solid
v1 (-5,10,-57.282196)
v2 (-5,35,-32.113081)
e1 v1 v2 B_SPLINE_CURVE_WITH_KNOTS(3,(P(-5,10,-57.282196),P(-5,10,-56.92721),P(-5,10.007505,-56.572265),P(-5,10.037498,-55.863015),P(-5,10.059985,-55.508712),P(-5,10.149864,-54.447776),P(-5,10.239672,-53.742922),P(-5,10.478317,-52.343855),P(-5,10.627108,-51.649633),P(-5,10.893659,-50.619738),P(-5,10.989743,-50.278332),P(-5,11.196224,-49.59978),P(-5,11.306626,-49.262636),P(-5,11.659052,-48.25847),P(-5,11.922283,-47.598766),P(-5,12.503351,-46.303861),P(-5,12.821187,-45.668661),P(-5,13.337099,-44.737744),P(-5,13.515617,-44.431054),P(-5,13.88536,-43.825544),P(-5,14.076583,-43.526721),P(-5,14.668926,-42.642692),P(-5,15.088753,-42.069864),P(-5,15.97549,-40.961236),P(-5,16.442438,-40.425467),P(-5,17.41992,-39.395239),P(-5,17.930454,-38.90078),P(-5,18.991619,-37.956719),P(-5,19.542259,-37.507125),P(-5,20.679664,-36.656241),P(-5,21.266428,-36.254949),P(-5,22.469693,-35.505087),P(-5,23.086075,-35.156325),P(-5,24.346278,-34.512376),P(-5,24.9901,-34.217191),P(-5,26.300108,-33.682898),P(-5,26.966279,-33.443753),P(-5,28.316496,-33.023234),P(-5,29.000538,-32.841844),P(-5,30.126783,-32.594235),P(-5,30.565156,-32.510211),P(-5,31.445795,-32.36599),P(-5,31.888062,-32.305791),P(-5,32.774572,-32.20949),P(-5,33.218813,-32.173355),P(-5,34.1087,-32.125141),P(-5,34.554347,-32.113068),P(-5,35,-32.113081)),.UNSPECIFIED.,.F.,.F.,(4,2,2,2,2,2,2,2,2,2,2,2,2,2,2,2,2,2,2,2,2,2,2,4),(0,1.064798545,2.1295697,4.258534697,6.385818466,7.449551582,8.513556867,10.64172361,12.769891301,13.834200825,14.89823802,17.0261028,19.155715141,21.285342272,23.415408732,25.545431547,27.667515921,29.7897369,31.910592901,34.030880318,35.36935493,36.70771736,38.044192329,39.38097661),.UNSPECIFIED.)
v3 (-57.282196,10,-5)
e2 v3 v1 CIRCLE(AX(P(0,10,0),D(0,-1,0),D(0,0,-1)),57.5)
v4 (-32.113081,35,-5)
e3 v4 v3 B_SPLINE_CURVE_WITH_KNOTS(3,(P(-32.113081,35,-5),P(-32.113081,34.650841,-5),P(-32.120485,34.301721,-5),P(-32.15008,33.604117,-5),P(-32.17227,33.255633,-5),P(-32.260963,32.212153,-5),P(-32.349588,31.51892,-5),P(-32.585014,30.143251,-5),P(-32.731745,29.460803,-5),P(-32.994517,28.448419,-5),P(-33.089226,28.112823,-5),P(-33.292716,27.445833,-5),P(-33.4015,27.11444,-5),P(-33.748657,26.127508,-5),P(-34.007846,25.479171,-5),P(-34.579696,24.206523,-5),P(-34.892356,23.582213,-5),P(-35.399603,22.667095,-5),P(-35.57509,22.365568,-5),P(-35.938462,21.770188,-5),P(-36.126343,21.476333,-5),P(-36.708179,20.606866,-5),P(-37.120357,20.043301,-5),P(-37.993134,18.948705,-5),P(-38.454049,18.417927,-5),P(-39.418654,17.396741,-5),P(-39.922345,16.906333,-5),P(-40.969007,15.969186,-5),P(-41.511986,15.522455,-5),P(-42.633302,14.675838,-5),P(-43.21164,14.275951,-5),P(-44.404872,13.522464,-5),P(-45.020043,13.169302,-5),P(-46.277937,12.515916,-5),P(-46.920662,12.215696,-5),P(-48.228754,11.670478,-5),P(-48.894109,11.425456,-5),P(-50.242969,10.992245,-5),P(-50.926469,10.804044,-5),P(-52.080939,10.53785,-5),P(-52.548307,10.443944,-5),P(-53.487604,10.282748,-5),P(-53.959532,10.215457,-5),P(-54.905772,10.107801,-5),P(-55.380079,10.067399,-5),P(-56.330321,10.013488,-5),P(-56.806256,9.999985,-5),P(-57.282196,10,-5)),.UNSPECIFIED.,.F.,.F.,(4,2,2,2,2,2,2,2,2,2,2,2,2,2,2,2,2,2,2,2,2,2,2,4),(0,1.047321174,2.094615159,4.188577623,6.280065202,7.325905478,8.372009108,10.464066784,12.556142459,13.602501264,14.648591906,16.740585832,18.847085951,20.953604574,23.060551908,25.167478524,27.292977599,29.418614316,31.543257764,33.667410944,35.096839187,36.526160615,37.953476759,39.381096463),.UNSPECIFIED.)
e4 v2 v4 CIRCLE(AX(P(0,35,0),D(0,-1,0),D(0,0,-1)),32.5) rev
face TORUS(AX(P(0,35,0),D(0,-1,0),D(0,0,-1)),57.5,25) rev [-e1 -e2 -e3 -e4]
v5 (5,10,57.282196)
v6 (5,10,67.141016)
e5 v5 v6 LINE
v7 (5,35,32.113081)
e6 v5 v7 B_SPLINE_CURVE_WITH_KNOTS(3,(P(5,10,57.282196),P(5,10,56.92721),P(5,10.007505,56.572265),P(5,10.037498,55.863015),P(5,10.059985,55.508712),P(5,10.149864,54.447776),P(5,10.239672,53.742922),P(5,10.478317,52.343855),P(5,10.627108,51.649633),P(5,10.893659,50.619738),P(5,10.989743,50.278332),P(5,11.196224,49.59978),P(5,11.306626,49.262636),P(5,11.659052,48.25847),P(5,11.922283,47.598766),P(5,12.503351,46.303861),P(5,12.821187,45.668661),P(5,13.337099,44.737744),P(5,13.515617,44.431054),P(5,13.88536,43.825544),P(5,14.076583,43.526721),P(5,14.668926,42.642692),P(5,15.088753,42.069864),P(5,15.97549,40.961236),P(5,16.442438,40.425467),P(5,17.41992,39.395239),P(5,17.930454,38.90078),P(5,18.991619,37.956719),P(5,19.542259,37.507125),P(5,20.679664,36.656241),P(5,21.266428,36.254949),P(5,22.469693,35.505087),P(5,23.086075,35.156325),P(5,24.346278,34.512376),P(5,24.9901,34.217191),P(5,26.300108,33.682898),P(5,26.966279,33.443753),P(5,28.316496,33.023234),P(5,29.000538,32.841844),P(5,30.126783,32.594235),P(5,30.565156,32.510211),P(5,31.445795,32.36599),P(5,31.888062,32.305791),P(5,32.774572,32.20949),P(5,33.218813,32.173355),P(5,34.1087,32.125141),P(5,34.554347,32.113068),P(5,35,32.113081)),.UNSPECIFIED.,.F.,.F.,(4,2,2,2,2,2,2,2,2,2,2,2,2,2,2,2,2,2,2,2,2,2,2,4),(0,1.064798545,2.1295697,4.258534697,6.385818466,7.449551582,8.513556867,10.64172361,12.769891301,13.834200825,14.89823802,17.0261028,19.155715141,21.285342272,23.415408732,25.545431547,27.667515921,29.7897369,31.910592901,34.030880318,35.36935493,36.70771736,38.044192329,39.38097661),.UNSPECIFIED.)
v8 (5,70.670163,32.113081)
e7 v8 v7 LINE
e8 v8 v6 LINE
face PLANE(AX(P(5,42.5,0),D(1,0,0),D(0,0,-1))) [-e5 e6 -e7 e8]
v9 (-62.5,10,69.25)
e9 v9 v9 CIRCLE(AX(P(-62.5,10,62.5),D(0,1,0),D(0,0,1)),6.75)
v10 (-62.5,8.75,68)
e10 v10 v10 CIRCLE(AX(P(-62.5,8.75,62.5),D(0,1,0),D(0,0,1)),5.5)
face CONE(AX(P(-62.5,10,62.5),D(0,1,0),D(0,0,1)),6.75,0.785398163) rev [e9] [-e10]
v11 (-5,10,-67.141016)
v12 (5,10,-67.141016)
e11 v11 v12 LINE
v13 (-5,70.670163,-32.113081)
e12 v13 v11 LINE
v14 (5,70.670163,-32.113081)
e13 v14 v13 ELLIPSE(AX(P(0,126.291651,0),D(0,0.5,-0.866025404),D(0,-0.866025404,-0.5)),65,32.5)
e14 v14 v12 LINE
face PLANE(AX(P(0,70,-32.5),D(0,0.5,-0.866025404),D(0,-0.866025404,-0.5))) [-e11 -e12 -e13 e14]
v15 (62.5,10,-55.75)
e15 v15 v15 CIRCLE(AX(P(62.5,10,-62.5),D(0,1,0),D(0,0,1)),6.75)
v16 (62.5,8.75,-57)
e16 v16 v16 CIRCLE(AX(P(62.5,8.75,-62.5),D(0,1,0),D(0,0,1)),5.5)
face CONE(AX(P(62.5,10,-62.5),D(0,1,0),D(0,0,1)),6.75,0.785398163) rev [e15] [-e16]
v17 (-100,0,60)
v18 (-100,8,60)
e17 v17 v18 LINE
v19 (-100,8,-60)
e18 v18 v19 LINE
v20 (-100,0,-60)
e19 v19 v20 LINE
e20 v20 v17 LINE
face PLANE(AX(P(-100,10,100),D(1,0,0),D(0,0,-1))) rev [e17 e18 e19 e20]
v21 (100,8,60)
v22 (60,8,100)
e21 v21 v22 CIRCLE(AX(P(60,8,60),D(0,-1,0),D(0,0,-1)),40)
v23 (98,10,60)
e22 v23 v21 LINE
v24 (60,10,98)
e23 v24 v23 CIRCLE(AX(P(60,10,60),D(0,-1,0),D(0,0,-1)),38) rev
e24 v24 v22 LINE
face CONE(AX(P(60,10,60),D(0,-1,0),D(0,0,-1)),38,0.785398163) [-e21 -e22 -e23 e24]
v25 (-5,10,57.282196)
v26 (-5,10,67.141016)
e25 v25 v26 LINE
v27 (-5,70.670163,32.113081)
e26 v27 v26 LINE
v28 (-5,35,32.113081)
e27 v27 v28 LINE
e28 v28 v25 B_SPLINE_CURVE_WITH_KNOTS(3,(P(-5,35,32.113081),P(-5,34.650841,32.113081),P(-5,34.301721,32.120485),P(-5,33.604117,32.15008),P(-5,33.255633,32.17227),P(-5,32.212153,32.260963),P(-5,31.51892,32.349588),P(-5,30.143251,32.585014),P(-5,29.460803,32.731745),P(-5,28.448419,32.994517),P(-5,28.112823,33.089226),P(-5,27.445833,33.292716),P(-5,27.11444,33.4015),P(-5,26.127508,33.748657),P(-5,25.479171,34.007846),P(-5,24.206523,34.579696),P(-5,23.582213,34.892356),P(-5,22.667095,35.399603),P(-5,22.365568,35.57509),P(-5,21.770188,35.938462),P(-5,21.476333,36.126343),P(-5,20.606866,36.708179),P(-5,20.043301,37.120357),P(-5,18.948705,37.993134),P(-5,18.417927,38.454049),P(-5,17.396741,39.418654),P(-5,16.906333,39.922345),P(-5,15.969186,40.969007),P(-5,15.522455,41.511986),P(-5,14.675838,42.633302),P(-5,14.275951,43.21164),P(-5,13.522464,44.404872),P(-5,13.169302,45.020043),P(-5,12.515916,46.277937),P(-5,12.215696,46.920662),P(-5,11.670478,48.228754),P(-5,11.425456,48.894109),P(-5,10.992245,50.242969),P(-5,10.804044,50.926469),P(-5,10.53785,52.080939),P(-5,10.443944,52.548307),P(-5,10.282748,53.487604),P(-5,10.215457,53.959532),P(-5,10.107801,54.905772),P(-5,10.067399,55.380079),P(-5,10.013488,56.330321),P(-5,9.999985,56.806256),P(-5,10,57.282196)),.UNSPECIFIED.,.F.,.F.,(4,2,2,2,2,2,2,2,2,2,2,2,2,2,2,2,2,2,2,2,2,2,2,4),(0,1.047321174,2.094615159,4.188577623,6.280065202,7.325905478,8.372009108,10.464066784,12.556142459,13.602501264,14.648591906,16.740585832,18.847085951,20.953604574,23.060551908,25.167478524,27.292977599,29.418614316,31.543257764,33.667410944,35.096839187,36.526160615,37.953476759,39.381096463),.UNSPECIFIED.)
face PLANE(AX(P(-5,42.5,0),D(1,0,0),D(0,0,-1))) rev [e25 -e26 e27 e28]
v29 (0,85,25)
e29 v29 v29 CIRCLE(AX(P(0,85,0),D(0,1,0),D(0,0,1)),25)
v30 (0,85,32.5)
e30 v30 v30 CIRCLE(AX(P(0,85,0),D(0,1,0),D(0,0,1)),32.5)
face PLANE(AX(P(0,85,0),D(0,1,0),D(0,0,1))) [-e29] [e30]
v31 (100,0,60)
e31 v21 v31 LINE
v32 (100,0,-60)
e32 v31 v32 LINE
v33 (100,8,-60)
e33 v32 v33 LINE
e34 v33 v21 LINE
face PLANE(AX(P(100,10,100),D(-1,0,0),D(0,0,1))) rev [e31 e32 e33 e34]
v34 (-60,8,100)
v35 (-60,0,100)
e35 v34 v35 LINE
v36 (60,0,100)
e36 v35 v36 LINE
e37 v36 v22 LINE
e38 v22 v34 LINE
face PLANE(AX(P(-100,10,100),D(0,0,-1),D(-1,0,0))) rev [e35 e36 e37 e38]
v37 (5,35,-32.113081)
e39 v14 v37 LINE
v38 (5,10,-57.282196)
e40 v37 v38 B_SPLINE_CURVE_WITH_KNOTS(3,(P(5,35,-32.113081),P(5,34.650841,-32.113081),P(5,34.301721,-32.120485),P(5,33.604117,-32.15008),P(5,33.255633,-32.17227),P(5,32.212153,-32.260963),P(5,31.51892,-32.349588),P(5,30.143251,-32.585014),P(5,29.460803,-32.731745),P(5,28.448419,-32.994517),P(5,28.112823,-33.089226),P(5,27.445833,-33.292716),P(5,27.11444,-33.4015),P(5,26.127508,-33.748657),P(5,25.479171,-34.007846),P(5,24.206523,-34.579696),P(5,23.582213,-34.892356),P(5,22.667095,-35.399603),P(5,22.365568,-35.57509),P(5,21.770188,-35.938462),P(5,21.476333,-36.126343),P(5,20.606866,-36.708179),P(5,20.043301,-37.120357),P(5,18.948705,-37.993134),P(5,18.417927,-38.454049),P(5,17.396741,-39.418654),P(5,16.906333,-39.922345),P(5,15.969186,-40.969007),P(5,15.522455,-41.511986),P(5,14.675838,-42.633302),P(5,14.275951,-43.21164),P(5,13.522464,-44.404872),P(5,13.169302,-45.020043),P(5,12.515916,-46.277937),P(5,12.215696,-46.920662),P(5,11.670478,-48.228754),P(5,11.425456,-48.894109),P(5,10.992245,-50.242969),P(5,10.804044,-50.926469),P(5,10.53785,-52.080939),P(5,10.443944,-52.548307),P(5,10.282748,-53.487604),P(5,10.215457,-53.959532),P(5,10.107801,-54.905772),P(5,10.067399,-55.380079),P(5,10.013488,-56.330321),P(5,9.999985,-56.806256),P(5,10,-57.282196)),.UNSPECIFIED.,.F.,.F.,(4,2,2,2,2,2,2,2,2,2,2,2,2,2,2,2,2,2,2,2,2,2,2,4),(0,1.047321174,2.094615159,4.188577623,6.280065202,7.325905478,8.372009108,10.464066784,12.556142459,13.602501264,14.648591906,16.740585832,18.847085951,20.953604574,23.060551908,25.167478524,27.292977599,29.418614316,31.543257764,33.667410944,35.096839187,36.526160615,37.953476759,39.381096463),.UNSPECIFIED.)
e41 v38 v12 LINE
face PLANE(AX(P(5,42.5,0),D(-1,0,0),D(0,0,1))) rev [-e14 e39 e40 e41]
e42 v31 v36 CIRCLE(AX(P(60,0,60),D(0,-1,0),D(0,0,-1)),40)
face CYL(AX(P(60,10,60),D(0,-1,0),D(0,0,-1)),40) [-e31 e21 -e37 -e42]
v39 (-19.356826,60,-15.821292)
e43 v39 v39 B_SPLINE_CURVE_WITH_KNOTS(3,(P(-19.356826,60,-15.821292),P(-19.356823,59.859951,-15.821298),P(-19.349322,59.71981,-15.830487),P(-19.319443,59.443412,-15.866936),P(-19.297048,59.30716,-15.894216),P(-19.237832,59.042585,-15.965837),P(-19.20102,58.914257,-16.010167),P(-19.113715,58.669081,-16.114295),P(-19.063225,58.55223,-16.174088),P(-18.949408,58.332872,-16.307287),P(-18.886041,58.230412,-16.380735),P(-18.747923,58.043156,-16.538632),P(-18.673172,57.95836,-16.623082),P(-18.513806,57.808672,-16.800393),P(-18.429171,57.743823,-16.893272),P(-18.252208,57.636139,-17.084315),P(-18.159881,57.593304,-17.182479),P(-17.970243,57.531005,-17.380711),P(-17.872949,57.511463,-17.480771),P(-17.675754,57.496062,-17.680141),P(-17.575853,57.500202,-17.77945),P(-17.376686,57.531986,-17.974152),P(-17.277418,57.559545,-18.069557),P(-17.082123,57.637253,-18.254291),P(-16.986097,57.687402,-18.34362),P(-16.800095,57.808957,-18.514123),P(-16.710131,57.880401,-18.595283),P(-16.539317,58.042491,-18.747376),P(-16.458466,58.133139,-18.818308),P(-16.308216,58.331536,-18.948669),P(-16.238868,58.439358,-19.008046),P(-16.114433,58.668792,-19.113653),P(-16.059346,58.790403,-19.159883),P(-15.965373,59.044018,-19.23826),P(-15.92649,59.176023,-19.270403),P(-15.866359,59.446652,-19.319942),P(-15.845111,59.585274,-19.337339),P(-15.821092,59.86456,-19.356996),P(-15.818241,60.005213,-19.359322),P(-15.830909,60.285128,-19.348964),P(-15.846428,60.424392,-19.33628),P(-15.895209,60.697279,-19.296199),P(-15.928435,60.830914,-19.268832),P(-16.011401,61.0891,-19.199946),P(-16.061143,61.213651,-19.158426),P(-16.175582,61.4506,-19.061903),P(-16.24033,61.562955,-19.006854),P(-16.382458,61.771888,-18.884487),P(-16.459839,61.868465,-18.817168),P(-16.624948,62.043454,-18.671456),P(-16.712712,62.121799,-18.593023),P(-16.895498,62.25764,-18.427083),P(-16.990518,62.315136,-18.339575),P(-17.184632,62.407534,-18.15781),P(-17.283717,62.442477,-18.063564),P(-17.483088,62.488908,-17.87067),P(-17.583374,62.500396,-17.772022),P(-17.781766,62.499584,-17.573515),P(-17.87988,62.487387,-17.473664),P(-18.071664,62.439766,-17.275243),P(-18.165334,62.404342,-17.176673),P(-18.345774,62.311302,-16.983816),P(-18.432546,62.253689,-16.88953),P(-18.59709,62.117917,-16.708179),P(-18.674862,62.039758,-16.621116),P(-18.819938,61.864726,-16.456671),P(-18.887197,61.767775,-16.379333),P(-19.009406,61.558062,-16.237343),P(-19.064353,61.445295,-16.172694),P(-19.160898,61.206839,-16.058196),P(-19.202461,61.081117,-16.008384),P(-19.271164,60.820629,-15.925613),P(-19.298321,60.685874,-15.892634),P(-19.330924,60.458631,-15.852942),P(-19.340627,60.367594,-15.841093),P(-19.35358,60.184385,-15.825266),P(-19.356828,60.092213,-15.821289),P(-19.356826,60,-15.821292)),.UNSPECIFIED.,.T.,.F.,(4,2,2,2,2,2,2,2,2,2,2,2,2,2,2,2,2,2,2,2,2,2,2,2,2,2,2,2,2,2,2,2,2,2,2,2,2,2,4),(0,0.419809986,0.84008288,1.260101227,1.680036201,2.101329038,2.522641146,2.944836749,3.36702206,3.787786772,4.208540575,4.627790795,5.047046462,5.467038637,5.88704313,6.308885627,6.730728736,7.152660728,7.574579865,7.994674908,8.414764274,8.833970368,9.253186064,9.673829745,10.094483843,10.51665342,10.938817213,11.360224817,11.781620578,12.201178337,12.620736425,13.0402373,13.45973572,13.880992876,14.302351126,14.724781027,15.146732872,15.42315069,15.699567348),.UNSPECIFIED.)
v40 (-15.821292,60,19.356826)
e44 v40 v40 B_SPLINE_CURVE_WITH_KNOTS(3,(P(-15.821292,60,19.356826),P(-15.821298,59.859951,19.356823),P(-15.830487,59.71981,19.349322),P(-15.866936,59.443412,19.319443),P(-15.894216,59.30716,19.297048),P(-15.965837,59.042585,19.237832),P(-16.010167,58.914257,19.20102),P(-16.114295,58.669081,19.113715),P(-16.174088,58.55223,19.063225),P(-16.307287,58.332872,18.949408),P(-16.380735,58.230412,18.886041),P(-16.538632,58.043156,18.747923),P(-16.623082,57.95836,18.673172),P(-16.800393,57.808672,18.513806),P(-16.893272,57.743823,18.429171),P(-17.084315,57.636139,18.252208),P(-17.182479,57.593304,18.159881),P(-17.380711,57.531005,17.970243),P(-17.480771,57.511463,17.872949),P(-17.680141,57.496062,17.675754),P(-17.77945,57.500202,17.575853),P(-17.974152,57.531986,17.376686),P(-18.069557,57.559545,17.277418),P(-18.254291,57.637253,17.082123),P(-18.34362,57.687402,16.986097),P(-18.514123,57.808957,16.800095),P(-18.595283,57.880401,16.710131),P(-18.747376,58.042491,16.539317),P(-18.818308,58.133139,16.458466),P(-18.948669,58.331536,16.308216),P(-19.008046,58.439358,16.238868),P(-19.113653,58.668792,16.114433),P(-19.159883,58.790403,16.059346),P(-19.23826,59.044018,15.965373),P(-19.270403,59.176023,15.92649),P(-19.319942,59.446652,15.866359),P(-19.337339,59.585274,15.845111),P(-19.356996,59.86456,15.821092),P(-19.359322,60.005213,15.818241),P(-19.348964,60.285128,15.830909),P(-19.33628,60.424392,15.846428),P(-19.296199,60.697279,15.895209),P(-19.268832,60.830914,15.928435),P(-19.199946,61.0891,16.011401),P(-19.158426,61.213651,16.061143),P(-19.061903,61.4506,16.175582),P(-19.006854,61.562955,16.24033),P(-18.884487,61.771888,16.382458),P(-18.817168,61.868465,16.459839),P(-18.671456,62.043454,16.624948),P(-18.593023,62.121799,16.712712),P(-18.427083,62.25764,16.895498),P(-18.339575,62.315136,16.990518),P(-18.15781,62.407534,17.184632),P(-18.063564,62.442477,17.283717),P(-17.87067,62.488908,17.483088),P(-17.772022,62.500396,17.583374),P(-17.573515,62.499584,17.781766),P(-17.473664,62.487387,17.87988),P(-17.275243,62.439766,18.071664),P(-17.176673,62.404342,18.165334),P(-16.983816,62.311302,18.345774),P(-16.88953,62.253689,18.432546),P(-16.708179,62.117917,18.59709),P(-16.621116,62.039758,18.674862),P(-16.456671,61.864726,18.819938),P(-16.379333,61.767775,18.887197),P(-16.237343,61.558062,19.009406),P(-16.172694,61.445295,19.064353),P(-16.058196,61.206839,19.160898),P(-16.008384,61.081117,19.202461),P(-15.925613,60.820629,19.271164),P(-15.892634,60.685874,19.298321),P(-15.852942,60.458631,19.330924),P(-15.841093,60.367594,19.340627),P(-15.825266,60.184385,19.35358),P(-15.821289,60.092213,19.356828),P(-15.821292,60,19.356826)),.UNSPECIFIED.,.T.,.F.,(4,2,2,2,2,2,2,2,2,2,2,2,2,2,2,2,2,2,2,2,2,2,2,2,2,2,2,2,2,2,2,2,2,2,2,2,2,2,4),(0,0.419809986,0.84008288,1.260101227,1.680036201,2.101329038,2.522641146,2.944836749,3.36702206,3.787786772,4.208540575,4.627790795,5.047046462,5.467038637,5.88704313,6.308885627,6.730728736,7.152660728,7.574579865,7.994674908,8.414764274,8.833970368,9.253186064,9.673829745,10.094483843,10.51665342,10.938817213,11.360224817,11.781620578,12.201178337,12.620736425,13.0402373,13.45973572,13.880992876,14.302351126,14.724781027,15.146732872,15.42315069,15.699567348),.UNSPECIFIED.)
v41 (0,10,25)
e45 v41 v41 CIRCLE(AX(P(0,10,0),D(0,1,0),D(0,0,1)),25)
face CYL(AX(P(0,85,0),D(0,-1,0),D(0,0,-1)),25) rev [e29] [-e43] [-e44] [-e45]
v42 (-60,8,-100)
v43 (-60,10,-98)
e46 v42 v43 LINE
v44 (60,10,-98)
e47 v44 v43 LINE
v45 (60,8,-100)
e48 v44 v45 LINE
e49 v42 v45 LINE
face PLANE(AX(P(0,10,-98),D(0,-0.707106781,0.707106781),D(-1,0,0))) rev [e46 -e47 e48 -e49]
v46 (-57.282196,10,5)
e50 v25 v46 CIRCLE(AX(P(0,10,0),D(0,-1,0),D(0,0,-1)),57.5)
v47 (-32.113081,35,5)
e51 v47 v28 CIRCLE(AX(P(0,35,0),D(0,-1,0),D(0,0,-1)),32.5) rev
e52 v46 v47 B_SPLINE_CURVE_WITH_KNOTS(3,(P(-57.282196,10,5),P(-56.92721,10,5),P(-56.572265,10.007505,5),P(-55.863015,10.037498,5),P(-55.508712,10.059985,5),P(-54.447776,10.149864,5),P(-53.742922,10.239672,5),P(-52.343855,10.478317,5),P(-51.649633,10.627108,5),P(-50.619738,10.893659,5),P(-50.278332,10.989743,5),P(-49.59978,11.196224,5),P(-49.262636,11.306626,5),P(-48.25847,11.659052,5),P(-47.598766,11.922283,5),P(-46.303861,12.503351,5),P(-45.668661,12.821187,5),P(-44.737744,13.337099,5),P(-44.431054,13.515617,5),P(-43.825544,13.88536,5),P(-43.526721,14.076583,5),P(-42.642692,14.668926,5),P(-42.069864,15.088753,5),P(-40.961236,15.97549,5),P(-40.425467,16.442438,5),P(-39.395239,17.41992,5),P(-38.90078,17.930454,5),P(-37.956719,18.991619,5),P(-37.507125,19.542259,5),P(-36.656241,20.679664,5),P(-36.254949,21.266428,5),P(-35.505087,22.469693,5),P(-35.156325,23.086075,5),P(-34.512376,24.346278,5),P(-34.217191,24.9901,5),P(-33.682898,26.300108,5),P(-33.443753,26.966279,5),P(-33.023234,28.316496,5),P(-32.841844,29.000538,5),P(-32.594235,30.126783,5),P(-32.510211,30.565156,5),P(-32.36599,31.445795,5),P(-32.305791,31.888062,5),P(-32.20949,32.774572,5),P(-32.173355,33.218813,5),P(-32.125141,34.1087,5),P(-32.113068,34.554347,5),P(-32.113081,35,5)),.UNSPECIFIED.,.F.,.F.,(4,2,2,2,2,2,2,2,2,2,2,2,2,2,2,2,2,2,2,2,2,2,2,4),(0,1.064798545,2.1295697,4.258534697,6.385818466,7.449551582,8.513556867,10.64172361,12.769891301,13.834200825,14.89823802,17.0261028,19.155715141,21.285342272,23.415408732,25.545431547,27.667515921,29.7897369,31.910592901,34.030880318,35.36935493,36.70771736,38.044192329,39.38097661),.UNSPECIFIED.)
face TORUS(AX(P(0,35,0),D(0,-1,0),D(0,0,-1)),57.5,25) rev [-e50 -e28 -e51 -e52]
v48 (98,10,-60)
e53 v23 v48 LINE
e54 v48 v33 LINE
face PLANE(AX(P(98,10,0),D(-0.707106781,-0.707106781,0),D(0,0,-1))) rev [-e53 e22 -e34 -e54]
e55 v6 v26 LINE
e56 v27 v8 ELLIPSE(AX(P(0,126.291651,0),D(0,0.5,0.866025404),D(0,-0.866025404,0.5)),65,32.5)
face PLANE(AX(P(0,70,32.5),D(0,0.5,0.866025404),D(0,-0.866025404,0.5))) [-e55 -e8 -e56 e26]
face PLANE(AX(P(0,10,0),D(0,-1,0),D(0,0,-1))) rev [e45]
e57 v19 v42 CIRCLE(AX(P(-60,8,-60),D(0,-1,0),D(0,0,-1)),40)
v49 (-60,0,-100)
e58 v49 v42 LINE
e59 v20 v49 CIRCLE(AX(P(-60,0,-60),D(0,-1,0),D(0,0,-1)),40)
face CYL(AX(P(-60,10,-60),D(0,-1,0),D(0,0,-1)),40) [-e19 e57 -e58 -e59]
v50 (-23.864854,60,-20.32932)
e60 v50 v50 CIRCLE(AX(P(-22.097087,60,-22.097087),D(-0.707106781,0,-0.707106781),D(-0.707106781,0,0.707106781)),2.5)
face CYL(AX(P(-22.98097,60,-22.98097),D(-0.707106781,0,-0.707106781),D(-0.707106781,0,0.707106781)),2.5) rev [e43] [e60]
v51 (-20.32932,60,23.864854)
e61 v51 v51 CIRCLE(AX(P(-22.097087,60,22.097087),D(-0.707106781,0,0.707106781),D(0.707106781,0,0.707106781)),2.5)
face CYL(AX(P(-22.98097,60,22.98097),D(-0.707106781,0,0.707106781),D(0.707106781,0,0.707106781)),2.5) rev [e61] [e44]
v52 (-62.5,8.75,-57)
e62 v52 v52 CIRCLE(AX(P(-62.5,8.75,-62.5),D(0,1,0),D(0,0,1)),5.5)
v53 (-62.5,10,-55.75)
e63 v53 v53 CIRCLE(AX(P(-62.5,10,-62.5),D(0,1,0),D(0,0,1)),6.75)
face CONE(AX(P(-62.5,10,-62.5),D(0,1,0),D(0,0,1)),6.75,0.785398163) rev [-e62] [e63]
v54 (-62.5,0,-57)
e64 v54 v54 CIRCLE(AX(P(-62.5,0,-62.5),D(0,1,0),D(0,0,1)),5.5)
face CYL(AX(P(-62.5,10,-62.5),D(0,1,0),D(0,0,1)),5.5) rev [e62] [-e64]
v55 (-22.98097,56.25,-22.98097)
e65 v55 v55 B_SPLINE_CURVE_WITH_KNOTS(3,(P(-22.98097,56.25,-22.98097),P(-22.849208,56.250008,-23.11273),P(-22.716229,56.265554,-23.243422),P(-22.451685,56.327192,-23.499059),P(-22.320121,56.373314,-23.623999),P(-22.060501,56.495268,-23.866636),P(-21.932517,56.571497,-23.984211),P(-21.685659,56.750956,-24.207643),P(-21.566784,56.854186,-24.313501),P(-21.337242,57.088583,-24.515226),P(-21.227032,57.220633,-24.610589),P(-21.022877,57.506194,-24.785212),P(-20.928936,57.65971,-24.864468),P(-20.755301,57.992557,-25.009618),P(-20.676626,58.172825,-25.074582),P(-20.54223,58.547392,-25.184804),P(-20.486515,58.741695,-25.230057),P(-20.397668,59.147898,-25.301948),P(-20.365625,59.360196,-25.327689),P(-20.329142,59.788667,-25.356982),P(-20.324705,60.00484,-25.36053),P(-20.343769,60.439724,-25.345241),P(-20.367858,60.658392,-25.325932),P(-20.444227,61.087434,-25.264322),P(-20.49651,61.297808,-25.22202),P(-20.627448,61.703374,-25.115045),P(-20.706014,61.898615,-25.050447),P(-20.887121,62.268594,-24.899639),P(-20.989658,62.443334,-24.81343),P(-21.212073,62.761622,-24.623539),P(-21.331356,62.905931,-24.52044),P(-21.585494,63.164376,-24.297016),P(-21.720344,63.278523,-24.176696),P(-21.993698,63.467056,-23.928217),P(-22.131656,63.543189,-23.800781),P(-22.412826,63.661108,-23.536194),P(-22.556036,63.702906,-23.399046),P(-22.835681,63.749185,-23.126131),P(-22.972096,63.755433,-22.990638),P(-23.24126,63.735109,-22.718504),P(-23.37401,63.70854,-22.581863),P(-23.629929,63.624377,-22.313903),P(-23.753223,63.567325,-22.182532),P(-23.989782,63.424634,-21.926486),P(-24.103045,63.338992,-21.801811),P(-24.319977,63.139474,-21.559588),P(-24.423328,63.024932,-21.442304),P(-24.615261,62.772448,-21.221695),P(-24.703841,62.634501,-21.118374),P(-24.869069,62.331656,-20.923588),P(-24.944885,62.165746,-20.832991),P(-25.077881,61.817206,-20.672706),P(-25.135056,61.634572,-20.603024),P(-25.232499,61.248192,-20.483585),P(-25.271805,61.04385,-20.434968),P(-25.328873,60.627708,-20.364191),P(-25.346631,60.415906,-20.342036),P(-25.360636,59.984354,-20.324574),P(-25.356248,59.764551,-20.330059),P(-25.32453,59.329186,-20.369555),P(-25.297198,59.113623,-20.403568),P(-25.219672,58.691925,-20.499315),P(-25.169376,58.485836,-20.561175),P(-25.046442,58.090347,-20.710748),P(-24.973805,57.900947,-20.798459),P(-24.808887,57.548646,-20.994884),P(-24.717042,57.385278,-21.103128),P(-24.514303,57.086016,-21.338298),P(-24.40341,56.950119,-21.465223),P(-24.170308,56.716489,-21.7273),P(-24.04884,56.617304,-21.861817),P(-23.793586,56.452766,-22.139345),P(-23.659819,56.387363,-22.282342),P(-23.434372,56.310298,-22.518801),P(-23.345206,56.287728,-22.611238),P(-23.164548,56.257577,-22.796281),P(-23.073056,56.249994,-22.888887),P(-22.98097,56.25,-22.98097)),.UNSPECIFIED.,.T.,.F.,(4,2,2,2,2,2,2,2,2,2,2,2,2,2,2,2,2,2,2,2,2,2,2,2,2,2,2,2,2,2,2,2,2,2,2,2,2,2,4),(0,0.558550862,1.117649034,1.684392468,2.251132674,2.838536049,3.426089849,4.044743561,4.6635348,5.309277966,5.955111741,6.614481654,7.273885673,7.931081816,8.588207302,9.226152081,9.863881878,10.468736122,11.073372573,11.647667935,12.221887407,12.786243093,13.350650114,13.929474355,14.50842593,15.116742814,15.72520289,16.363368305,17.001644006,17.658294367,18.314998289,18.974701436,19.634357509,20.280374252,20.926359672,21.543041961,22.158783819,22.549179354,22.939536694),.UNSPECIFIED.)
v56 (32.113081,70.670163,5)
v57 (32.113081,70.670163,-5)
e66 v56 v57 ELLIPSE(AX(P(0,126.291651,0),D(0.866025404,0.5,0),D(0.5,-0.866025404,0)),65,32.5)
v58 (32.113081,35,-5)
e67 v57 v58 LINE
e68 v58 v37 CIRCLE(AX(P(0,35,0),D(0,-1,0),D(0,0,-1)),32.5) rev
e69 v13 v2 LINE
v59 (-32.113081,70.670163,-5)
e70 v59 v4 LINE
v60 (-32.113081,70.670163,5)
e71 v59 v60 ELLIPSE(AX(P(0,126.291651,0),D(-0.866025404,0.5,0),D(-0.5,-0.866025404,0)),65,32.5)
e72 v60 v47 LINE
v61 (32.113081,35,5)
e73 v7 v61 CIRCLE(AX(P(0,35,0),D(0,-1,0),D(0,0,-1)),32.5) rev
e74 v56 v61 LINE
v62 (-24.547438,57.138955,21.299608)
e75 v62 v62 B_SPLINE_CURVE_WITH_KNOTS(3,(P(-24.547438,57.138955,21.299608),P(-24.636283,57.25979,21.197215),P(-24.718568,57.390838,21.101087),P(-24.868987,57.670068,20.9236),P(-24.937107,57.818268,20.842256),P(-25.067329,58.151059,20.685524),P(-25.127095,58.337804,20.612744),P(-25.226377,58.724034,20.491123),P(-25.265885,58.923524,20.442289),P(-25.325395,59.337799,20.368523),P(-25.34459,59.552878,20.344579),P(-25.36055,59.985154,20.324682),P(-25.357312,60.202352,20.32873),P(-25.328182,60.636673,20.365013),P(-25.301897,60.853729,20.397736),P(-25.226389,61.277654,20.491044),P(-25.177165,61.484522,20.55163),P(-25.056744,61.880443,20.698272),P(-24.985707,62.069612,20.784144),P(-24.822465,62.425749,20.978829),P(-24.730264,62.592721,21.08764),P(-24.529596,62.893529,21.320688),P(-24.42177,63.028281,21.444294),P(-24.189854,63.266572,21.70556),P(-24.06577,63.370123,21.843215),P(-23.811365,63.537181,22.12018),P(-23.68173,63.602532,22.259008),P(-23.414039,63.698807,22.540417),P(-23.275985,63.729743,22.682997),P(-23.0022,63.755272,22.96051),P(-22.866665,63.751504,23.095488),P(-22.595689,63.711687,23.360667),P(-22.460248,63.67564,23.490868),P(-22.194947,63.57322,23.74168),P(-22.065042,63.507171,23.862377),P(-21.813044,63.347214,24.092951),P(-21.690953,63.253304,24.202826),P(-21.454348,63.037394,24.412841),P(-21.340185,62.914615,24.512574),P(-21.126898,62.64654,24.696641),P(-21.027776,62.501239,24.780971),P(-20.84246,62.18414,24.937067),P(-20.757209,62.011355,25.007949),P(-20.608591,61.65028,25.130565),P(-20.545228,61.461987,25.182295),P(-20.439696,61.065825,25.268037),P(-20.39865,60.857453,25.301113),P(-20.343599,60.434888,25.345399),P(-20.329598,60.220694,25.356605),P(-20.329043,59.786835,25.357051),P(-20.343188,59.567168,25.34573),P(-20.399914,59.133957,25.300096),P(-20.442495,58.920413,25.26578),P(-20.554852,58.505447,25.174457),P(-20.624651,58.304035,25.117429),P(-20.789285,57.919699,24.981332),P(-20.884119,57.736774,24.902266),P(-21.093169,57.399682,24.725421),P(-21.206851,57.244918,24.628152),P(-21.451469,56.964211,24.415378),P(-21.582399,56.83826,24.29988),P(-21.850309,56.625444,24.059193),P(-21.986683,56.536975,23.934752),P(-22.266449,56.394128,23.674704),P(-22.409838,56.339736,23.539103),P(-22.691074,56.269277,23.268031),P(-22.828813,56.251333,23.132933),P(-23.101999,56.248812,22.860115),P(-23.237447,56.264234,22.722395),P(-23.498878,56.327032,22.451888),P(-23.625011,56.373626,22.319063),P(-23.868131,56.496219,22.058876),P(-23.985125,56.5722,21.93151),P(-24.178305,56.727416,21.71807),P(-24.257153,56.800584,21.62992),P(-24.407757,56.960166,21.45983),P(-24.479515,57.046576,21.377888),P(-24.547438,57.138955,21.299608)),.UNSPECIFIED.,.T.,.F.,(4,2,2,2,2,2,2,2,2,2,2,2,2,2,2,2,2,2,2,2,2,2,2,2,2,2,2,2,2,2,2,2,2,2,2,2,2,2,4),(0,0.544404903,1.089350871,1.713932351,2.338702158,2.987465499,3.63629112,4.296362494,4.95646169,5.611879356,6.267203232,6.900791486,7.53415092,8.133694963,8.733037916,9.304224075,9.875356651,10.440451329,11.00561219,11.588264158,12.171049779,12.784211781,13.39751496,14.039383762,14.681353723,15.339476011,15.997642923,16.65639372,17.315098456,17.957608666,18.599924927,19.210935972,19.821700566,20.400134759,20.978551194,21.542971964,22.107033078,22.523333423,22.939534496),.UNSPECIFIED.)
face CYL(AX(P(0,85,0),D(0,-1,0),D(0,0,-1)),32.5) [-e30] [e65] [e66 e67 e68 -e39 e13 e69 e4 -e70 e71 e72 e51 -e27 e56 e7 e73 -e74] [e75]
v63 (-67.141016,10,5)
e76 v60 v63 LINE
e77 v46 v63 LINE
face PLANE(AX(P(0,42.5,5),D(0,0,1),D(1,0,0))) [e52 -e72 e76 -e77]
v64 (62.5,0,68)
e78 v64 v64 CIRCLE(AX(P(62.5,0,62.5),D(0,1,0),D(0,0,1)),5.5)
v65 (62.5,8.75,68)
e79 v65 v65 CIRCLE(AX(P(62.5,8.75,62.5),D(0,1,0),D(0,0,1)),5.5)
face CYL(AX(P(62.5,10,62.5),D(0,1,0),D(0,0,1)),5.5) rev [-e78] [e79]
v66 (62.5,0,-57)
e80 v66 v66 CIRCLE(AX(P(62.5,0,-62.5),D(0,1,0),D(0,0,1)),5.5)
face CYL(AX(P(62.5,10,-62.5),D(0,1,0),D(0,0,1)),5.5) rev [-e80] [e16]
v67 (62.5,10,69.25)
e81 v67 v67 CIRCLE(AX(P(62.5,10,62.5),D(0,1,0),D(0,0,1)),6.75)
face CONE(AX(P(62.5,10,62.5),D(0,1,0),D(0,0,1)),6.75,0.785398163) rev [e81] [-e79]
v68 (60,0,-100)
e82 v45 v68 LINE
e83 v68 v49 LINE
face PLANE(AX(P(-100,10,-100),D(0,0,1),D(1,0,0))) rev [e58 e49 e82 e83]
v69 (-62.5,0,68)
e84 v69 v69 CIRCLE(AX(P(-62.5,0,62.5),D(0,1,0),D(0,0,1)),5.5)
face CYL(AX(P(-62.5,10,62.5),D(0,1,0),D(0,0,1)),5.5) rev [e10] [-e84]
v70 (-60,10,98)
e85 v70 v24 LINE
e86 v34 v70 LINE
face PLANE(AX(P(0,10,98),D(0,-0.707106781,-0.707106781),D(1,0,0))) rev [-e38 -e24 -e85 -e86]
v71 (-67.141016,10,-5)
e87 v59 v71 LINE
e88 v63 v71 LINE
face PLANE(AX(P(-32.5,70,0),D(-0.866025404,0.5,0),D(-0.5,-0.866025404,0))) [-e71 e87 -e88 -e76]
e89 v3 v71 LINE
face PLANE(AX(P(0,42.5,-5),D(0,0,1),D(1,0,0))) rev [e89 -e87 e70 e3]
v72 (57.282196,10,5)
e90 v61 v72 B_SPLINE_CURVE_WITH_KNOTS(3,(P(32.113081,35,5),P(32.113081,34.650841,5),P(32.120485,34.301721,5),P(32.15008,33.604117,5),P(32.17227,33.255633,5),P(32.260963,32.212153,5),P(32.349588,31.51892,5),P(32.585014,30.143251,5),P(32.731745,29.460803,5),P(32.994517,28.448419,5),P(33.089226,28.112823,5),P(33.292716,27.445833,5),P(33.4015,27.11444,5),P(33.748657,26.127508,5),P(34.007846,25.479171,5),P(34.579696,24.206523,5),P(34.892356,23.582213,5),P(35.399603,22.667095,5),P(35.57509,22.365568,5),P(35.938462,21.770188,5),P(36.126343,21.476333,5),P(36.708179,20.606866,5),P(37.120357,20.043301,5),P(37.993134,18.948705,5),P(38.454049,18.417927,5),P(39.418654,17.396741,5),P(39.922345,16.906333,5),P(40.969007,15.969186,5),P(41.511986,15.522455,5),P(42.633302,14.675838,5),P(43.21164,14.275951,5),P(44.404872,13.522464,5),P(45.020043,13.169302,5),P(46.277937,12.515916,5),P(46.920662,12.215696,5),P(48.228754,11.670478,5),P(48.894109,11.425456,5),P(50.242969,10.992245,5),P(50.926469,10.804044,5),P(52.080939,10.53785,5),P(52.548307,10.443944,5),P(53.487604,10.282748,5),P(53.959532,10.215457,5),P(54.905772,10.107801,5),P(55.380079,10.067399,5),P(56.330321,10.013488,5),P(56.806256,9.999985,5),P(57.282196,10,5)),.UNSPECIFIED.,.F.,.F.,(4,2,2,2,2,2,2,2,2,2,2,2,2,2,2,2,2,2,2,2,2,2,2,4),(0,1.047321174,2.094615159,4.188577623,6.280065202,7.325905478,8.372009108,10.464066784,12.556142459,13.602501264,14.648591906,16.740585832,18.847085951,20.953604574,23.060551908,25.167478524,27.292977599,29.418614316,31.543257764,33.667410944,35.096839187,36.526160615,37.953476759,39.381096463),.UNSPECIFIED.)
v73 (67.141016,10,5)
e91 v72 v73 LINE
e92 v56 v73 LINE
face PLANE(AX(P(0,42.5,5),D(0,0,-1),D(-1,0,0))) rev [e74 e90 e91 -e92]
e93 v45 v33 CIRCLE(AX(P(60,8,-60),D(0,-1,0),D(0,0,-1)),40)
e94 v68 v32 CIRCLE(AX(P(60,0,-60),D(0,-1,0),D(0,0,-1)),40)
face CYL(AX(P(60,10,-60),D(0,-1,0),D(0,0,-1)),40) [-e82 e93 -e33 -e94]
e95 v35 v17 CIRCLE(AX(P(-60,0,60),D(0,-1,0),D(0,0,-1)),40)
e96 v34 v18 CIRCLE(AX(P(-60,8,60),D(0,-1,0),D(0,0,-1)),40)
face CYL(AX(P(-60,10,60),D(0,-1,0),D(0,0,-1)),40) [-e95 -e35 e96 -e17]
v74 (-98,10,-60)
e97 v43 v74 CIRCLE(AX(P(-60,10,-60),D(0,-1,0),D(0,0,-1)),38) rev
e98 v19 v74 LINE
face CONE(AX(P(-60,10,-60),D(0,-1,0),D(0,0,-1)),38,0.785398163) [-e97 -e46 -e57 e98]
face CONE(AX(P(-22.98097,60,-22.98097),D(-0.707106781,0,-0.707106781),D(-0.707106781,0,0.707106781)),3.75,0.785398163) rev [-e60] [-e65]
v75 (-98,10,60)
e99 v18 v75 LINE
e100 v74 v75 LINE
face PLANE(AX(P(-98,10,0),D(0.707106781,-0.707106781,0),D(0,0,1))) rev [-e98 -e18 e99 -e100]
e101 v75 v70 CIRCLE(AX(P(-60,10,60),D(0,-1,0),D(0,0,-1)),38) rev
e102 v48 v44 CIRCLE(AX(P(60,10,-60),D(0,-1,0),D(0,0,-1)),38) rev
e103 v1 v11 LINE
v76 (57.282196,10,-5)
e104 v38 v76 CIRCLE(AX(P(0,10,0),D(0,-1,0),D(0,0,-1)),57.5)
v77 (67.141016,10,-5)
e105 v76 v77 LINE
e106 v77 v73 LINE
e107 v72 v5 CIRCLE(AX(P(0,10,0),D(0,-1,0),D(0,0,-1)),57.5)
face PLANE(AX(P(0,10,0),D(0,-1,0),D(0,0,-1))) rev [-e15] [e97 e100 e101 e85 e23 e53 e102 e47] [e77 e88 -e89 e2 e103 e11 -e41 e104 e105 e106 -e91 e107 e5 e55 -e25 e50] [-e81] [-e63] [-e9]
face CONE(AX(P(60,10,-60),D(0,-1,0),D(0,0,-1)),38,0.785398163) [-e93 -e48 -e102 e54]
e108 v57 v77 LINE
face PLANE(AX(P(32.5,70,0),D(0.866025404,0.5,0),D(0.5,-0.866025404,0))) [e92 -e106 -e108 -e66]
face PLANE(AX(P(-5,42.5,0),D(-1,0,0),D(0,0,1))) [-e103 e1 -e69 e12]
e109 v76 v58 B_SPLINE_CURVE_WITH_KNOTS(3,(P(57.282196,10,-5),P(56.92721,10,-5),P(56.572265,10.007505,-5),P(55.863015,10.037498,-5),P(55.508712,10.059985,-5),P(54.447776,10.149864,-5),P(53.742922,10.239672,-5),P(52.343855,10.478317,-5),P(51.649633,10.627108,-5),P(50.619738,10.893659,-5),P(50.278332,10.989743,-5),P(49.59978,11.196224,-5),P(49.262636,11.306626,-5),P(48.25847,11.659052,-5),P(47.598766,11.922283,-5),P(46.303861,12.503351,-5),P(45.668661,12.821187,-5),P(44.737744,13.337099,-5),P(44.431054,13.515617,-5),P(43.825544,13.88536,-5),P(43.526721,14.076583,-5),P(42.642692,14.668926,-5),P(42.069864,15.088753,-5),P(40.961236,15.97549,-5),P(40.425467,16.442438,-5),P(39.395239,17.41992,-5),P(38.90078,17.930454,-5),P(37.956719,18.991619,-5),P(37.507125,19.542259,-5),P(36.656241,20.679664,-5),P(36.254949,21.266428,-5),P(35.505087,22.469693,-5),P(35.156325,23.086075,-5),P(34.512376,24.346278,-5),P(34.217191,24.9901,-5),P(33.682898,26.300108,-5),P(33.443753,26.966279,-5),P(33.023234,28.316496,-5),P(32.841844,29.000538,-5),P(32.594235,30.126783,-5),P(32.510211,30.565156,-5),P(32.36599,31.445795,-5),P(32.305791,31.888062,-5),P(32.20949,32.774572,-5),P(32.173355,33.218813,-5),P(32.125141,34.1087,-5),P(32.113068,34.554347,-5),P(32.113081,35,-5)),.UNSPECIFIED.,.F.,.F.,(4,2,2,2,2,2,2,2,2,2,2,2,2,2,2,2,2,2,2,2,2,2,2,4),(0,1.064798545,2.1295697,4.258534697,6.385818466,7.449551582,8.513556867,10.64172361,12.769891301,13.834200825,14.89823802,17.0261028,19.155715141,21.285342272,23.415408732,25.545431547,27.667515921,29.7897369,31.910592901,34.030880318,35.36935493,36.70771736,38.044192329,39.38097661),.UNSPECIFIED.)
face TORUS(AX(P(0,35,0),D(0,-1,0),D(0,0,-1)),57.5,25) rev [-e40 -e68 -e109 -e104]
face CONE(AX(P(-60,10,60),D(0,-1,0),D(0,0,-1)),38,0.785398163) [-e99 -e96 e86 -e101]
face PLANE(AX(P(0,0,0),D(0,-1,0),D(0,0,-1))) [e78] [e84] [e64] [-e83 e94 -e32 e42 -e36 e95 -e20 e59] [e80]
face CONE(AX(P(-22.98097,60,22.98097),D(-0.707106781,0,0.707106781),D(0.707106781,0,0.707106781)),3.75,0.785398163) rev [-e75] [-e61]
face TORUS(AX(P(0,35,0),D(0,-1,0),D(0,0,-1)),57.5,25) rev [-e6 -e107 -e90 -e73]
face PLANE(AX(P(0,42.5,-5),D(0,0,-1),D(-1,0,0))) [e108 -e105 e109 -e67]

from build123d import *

# Parameters (mm, degrees)
SKETCH2_W                       = 200
SKETCH2_H                       = 200
BOSS_EXTRUDE1_DEPTH             = 10
SKETCH3_R                       = 32.5
SKETCH3_R_2                     = 25
BOSS_EXTRUDE2_DEPTH             = 75
M10_CLEARANCE_HOLE1_D           = 11
M10_CLEARANCE_HOLE1_CSINK_D     = 13.5
M10_CLEARANCE_HOLE1_CSINK_ANGLE = 90
CIRPATTERN1_COUNT               = 2
CIRPATTERN1_ANGLE               = 90
RIB5_REACH                      = 167
SKETCH13_WALL_W                 = 401.282032406
SKETCH13_WALL_H                 = 10
CIRPATTERN2_COUNT               = 4
FILLET1_R                       = 25
FILLET2_R                       = 40
CHAMFER1_SIZE                   = 2


# Read off the part's stored shape, not the designer's step: M6x1.0 Tapped Hole1
with BuildPart() as part:
    # Sketch2 → Boss-Extrude1 (new body)
    with BuildSketch(Plane(origin=(0, 0, 0), x_dir=(1, 0, 0), z_dir=(0, 1, 0))):
        Rectangle(SKETCH2_W, SKETCH2_H)
    extrude(amount=BOSS_EXTRUDE1_DEPTH)

    # Sketch3 → Boss-Extrude2 (add)
    with BuildSketch(Plane(origin=(0, 10, 0), x_dir=(1, 0, 0), z_dir=(0, 1, 0))):
        with Locations(Location((0, 0, 0), (0, 0, 90))):
            Circle(SKETCH3_R)
        with Locations(Location((0, 0, 0), (0, 0, 270))):
            Circle(SKETCH3_R_2, mode=Mode.SUBTRACT)
    extrude(amount=BOSS_EXTRUDE2_DEPTH)

    # M10 Clearance Hole1 (through all)
    with Locations(Plane(origin=(0, 10, 0), x_dir=(1, 0, 0), z_dir=(0, 1, 0))):
        with Locations((-62.5, -62.5), (62.5, 62.5), (-62.5, 62.5), (62.5, -62.5)):
            CounterSinkHole(M10_CLEARANCE_HOLE1_D / 2, M10_CLEARANCE_HOLE1_CSINK_D / 2, counter_sink_angle=M10_CLEARANCE_HOLE1_CSINK_ANGLE)

    # M6x1.0 Tapped Hole1 outline → M6x1.0 Tapped Hole1 (revolve, cut)
    with BuildSketch(Plane(origin=(0, 60, 0), x_dir=(0.707106781186546, 0, 0.707106781186549), z_dir=(0, 1, 0))):
        Polygon((0, -32.500112934), (3.750112934, -32.500112934), (2.5, -31.25), (2.5, -24.874618187), (0, -24.874618187), align=None)
    m6x1_0_tapped_hole1 = revolve(axis=Axis((0, 60, 0), (0.707106781186549, 0, -0.707106781186546)), mode=Mode.SUBTRACT)

    # CirPattern1: M6x1.0 Tapped Hole1 ×2 about axis
    cirpattern1_axis = Axis((0, 85, 0), (0, -1, 0))
    for i in range(1, CIRPATTERN1_COUNT):
        add(m6x1_0_tapped_hole1.rotate(cirpattern1_axis, i * CIRPATTERN1_ANGLE / (CIRPATTERN1_COUNT - 1)), mode=Mode.SUBTRACT)

    # Sketch13 wall → Rib5 (add, up to next)
    with BuildSketch(Plane(origin=(-49.820508076, 40, 0), x_dir=(-0.499999999996, -0.866025403787, 0), z_dir=(0.866025403787, -0.499999999996, 0)), mode=Mode.PRIVATE) as rib5_sk1:
        Rectangle(SKETCH13_WALL_W, SKETCH13_WALL_H)
    rib5_tool1 = extrude(rib5_sk1.sketch, amount=RIB5_REACH, mode=Mode.PRIVATE) - part.part
    rib5 = rib5_tool1.solids().sort_by_distance((-49.820508076, 40, 0))[0]
    add(rib5)

    # CirPattern2: Rib5 ×4 about axis
    cirpattern2_axis = Axis((0, 0, 0), (0, 1, 0))
    for i in range(1, CIRPATTERN2_COUNT):
        add(rib5.rotate(cirpattern2_axis, i * 360 / CIRPATTERN2_COUNT))

    # Fillet1
    fillet1_edges = [part.edges().sort_by_distance(p)[0] for p in [
        (-22.980970389, 10, -22.980970389),
        (22.980970389, 10, -22.980970389),
        (22.980970389, 10, 22.980970389),
        (-22.980970389, 10, 22.980970389),
    ]]
    fillet(fillet1_edges, radius=FILLET1_R)

    # Fillet2
    fillet2_edges = [part.edges().sort_by_distance(p)[0] for p in [
        (100, 5, 100),
        (-100, 5, 100),
        (-100, 5, -100),
        (100, 5, -100),
    ]]
    fillet(fillet2_edges, radius=FILLET2_R)

    # Chamfer1
    chamfer1_edges = [part.edges().sort_by_distance(p)[0] for p in [
        (0, 10, 100),
        (-100, 10, 0),
        (0, 10, -100),
        (100, 10, 0),
        (88.284271247, 10, 88.284271247),
        (88.284271247, 10, -88.284271247),
        (-88.284271247, 10, -88.284271247),
        (-88.284271247, 10, 88.284271247),
    ]]
    chamfer(chamfer1_edges, length=CHAMFER1_SIZE)


solid = part.part
